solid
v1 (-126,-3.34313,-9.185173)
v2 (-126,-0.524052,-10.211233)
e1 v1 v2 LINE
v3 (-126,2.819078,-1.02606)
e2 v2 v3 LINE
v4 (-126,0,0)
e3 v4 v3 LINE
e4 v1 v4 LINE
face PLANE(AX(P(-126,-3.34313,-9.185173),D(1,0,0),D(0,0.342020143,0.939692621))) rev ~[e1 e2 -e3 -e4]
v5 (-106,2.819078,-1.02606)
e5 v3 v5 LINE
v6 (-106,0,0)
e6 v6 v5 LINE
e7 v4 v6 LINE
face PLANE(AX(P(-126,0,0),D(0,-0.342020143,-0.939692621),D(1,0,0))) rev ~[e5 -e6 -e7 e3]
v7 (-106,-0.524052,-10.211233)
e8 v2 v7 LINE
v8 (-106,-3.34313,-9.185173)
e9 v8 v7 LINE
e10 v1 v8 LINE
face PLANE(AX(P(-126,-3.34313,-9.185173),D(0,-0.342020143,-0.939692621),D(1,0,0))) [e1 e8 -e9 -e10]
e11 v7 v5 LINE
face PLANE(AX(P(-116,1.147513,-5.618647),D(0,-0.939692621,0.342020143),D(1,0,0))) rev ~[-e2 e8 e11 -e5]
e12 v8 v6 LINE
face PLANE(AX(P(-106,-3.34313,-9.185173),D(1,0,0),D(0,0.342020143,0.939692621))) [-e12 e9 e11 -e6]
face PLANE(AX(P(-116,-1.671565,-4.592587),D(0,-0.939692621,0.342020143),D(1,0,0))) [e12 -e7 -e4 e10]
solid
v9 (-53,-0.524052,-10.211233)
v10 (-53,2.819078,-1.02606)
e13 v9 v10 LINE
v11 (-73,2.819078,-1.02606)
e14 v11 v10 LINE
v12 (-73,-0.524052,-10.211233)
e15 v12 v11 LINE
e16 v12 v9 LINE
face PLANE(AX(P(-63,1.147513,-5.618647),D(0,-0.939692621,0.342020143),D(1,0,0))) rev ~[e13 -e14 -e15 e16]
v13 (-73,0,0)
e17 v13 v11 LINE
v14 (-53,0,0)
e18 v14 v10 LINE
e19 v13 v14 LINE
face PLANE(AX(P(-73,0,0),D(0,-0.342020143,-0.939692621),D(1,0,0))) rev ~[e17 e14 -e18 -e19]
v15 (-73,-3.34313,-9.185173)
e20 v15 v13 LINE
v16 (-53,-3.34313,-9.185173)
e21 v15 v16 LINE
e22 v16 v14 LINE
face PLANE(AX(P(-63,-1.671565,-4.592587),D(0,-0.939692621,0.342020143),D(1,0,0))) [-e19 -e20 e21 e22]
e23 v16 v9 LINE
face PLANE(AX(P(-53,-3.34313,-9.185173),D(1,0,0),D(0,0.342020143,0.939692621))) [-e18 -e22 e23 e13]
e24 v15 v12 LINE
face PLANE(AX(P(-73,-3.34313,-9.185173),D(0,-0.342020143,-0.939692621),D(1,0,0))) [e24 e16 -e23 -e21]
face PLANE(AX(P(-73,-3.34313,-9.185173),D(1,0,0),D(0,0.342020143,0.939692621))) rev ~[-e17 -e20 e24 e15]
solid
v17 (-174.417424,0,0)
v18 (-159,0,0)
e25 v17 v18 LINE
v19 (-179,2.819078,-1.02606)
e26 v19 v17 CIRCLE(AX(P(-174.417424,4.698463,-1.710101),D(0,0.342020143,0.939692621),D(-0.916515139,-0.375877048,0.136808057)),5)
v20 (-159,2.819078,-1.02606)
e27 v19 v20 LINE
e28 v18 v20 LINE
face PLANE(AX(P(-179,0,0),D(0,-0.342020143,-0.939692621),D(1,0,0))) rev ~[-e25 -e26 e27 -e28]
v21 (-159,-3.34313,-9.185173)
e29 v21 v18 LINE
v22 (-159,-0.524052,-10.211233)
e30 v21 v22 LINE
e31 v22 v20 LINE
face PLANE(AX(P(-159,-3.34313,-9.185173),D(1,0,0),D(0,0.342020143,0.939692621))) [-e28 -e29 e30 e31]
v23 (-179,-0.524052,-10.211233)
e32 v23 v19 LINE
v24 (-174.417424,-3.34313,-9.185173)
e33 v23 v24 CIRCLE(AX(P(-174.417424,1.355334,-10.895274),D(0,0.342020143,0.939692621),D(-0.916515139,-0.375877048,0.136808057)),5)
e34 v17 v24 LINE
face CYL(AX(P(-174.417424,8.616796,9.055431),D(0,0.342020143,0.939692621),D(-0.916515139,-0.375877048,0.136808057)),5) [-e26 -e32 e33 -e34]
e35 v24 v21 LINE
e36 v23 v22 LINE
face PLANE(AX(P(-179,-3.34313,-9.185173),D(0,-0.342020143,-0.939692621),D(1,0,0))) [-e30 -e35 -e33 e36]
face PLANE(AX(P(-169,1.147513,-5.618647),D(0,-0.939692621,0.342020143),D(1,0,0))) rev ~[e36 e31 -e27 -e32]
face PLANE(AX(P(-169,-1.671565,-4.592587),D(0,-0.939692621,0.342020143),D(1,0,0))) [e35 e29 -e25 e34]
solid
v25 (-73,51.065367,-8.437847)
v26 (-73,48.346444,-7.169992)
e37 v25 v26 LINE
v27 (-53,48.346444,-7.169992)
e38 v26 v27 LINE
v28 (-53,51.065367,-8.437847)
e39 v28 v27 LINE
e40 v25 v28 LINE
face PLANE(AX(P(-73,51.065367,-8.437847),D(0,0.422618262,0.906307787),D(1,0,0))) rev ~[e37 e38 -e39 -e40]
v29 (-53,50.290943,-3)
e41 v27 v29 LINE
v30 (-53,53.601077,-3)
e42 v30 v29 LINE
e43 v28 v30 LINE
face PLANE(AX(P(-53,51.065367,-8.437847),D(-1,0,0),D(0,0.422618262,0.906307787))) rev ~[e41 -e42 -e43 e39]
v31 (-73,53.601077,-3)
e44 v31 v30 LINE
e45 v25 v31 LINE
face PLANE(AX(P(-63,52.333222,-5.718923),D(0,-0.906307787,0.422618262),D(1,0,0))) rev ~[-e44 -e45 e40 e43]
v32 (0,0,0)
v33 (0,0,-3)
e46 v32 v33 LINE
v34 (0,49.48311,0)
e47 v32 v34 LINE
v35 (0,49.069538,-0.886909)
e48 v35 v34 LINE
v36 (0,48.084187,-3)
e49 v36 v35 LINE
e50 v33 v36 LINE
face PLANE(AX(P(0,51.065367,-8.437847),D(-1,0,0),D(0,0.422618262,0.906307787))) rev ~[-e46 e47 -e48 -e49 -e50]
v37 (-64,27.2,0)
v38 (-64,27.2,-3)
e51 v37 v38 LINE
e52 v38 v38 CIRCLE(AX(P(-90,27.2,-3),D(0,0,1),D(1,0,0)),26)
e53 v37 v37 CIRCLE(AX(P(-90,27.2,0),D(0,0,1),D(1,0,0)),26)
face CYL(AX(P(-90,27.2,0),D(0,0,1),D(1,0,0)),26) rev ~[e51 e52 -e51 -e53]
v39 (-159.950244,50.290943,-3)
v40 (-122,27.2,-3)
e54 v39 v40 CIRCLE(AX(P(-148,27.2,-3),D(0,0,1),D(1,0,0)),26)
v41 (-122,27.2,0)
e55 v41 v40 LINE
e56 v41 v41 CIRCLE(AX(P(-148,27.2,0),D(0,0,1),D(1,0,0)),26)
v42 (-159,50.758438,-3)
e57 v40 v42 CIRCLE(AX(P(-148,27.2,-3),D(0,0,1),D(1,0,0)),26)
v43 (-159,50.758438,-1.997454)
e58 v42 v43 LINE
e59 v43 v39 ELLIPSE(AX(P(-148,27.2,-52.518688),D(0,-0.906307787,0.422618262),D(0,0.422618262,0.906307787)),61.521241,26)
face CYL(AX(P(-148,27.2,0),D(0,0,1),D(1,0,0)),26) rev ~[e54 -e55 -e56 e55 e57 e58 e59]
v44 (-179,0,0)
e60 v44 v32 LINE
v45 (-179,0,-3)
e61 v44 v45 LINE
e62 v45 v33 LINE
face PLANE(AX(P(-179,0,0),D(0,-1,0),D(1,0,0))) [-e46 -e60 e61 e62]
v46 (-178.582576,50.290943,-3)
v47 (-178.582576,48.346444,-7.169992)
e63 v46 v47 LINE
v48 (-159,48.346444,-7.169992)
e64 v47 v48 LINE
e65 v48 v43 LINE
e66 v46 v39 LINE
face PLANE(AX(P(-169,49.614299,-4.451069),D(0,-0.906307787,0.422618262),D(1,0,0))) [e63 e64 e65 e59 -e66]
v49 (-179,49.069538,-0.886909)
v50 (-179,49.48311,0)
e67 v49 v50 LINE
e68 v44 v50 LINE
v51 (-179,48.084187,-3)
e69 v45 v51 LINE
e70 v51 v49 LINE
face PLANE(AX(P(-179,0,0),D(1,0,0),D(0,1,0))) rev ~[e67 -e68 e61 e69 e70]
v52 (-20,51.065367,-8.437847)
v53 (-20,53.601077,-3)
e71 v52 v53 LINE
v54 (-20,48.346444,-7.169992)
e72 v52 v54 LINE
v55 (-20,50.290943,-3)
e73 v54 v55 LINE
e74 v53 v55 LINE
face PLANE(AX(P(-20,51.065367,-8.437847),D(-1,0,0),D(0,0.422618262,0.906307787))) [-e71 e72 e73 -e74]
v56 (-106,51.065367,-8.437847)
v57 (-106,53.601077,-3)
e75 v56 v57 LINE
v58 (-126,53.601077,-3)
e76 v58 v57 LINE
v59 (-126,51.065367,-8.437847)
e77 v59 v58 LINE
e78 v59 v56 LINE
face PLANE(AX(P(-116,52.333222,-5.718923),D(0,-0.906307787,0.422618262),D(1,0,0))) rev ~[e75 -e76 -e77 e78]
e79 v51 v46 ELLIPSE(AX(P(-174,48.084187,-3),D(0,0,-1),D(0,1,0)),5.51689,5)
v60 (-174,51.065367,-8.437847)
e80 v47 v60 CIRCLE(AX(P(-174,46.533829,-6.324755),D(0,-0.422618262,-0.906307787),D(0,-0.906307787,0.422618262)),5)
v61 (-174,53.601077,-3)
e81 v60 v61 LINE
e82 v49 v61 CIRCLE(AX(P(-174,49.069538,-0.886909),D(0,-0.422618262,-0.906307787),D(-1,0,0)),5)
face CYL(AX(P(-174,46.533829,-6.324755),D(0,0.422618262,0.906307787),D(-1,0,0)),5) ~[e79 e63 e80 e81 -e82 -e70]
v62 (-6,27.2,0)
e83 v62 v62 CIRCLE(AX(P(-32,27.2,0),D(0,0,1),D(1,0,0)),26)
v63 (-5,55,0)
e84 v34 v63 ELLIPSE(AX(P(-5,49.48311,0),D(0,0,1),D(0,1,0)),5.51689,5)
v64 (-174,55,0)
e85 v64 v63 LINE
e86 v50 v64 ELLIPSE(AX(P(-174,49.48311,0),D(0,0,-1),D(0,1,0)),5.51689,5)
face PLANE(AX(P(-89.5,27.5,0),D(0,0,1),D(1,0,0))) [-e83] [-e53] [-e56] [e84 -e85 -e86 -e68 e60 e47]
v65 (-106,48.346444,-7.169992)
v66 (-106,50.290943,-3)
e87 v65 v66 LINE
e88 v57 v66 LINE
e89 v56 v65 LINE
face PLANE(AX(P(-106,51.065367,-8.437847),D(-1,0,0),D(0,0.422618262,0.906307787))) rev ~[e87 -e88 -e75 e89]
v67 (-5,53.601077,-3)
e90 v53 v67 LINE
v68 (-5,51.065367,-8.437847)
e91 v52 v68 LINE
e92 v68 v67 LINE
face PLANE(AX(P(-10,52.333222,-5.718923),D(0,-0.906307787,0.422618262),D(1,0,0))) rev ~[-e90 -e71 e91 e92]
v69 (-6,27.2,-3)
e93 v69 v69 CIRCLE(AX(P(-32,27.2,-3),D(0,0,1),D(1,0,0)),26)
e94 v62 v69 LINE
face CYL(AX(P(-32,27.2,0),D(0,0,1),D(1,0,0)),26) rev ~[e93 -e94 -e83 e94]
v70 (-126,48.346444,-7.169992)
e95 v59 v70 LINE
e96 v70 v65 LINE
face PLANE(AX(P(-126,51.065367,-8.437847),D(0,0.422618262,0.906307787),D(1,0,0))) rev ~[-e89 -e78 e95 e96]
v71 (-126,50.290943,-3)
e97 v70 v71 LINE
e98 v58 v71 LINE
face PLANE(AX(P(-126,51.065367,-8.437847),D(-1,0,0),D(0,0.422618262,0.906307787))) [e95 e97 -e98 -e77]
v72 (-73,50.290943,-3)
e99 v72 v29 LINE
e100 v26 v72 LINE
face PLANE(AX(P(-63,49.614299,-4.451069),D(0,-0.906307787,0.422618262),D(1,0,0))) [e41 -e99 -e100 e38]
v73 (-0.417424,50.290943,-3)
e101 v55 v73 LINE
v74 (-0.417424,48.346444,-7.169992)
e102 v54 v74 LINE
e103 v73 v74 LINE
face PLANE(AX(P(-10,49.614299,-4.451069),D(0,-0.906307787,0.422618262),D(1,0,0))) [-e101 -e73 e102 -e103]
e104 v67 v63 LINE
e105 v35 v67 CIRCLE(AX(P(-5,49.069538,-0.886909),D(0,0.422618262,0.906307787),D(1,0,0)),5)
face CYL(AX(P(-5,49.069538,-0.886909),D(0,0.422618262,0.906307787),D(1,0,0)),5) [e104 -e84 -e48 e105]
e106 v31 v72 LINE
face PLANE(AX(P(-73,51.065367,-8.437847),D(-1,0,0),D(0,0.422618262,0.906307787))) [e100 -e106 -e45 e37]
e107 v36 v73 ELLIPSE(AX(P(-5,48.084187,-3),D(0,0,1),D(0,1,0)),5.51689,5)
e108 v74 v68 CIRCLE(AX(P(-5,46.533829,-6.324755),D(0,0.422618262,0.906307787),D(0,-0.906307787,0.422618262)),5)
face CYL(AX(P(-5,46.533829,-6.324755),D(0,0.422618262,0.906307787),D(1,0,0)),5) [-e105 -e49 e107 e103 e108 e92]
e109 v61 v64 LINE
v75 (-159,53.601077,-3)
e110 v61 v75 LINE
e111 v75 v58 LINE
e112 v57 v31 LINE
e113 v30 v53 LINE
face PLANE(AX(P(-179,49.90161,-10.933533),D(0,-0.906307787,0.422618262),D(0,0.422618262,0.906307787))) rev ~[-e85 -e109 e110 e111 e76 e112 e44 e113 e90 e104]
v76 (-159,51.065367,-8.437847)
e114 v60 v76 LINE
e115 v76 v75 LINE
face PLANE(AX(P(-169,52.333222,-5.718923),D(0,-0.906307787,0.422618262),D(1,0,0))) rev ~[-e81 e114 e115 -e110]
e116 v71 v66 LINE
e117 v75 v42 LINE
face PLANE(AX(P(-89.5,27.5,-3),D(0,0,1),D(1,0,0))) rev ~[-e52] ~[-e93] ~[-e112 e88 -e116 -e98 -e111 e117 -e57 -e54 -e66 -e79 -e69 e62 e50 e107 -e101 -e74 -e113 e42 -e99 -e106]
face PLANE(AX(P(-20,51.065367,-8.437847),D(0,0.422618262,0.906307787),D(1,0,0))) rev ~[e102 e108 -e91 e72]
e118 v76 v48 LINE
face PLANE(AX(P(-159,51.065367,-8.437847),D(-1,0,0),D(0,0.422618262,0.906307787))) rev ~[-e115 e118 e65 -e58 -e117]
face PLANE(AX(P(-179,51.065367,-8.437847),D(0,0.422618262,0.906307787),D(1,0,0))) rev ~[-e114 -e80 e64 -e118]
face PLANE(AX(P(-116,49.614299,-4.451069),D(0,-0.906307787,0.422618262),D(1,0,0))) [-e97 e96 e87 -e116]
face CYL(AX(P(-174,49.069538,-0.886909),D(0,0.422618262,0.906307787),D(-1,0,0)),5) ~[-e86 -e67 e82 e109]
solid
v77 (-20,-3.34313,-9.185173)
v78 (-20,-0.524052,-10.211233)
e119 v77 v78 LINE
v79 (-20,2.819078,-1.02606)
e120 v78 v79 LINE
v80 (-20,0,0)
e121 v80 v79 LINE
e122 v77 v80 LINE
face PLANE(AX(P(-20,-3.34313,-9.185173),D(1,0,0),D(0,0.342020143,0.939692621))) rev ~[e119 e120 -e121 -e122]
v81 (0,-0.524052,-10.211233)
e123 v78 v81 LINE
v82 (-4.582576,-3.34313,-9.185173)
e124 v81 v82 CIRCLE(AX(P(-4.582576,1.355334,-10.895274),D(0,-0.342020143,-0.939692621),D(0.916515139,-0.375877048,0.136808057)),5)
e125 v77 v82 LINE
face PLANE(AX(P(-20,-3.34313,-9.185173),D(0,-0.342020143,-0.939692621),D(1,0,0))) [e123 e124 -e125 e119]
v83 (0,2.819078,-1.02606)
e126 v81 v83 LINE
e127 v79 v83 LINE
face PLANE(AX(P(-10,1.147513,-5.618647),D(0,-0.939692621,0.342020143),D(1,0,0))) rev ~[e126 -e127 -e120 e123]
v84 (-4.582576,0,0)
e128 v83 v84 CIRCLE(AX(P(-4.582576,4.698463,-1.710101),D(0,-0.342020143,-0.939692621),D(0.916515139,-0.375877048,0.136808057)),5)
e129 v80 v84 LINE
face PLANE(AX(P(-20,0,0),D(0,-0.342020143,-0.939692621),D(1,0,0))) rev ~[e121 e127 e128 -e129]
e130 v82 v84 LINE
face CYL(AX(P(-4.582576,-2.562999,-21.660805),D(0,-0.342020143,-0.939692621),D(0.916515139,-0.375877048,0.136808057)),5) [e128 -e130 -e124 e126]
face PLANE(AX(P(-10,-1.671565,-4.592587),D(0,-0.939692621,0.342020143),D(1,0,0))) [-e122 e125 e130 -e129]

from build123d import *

# Parameters (mm, degrees)
F0_W           = 179
F0_H           = 55
F0_R           = 26
F1_DEPTH       = 3
F7_DEPTH       = 179.001
F8_W           = 20
F8_H           = 6
F9_DEPTH       = 3
F10_W          = 20
F10_H          = 9.7746569663
F11_DEPTH      = 3
F12_F1_R       = 5
F12_F2_R       = 5
F12_2_T1_DEPTH = 32.6875354411
F12_3_T1_DEPTH = 32.6875354411


# Not quite as in the source:
# - a fillet or chamfer that OpenCascade refuses, or shapes differently, is made with other operations: its cross-section is extruded or revolved along the edge and cut away or added


with BuildPart() as f1:
    # F0 (on Top) → F1 (new body)
    with BuildSketch(Plane.XY):
        with Locations((-89.5, 27.5)):
            Rectangle(F0_W, F0_H)
        with Locations((-148, 27.2)):
            Circle(F0_R, mode=Mode.SUBTRACT)
        with Locations((-90, 27.2)):
            Circle(F0_R, mode=Mode.SUBTRACT)
        with Locations((-32, 27.2)):
            Circle(F0_R, mode=Mode.SUBTRACT)
    extrude(amount=-F1_DEPTH)

    # F6 (on offset) → F7 (cut, through all)
    with BuildSketch(Plane(origin=(-179, 0, 0), x_dir=(0, -1, 0), z_dir=(-1, 0, 0))):
        Polygon((-49.9016099183, -10.9335328137), (-55, 0), (-57.2723100997, -1.0595956012), (-52.2457129351, -11.8391680074), align=None)
    extrude(amount=-F7_DEPTH, mode=Mode.SUBTRACT)

    # F8 (on face) → F9 (join)
    with BuildSketch(Plane(origin=(0, 45.1766592664, -21.0662221858), x_dir=(1, 0, 0), z_dir=(0, -0.906307787, 0.4226182617))):
        with Locations((-10, 16.9338706389)):
            Rectangle(F8_W, F8_H)
        with Locations((-169, 16.9338706389)):
            Rectangle(F8_W, F8_H)
        with Locations((-116, 16.9338706389)):
            Rectangle(F8_W, F8_H)
        with Locations((-63, 16.9338706389)):
            Rectangle(F8_W, F8_H)
    extrude(amount=F9_DEPTH)

    # F12: fillet of radius 5 on 2 edges, made by hand

    # F12_f1
    f12_f1_edges = [f1.edges().sort_by_distance(p)[0] for p in [
        (-179, 53.0326837275, -4.2189233611),
    ]]
    fillet(f12_f1_edges, radius=F12_F1_R)

    # F12_f2
    f12_f2_edges = [f1.edges().sort_by_distance(p)[0] for p in [
        (0, 53.0326837275, -4.2189233611),
    ]]
    fillet(f12_f2_edges, radius=F12_F2_R)


with BuildPart() as f11:
    # F10 (on face) → F11 (new body)
    with BuildSketch(Plane(origin=(0, 0, 0), x_dir=(1, 0, 0), z_dir=(0, -0.9396926208, 0.3420201433))):
        with Locations((-10, -4.8873284832)):
            Rectangle(F10_W, F10_H)
    extrude(amount=-F11_DEPTH)

    # F12#2: fillet of radius 5 on 1 edges, made by hand

    # F12_2_s2 → F12_2_t1 (cut)
    with BuildSketch(Plane(origin=(0, -7.2614625666, -19.9507044338), x_dir=(1, 0, 0), z_dir=(0, 0.3420201433, 0.9396926208))):
        with BuildLine():
            ThreePointArc((0, 3), (-1.8439629074, 0.8166998673), (-4.582575695, 0))
            Line((-4.582575695, 0), (0, 0))
            Line((0, 0), (0, 3))
        make_face()
    extrude(amount=F12_2_T1_DEPTH, mode=Mode.SUBTRACT)


with BuildPart() as f11b:
    # F10 (on face) → F11, piece 2 (new body)
    with BuildSketch(Plane(origin=(0, 0, 0), x_dir=(1, 0, 0), z_dir=(0, -0.9396926208, 0.3420201433))):
        with Locations((-169, -4.8873284832)):
            Rectangle(F10_W, F10_H)
    extrude(amount=-F11_DEPTH)

    # F12#3: fillet of radius 5 on 1 edges, made by hand

    # F12_3_s2 → F12_3_t1 (cut)
    with BuildSketch(Plane(origin=(0, 3.91833299, 10.7655314119), x_dir=(1, 0, 0), z_dir=(0, -0.3420201433, -0.9396926208))):
        with BuildLine():
            ThreePointArc((-179, -3), (-177.1560370926, -0.8166998673), (-174.417424305, 0))
            Line((-174.417424305, 0), (-179, 0))
            Line((-179, 0), (-179, -3))
        make_face()
    extrude(amount=F12_3_T1_DEPTH, mode=Mode.SUBTRACT)


with BuildPart() as f11c:
    # F10 (on face) → F11, piece 3 (new body)
    with BuildSketch(Plane(origin=(0, 0, 0), x_dir=(1, 0, 0), z_dir=(0, -0.9396926208, 0.3420201433))):
        with Locations((-116, -4.8873284832)):
            Rectangle(F10_W, F10_H)
    extrude(amount=-F11_DEPTH)


with BuildPart() as f11d:
    # F10 (on face) → F11, piece 4 (new body)
    with BuildSketch(Plane(origin=(0, 0, 0), x_dir=(1, 0, 0), z_dir=(0, -0.9396926208, 0.3420201433))):
        with Locations((-63, -4.8873284832)):
            Rectangle(F10_W, F10_H)
    extrude(amount=-F11_DEPTH)


solid = Compound([f1.part, f11.part, f11b.part, f11c.part, f11d.part])
